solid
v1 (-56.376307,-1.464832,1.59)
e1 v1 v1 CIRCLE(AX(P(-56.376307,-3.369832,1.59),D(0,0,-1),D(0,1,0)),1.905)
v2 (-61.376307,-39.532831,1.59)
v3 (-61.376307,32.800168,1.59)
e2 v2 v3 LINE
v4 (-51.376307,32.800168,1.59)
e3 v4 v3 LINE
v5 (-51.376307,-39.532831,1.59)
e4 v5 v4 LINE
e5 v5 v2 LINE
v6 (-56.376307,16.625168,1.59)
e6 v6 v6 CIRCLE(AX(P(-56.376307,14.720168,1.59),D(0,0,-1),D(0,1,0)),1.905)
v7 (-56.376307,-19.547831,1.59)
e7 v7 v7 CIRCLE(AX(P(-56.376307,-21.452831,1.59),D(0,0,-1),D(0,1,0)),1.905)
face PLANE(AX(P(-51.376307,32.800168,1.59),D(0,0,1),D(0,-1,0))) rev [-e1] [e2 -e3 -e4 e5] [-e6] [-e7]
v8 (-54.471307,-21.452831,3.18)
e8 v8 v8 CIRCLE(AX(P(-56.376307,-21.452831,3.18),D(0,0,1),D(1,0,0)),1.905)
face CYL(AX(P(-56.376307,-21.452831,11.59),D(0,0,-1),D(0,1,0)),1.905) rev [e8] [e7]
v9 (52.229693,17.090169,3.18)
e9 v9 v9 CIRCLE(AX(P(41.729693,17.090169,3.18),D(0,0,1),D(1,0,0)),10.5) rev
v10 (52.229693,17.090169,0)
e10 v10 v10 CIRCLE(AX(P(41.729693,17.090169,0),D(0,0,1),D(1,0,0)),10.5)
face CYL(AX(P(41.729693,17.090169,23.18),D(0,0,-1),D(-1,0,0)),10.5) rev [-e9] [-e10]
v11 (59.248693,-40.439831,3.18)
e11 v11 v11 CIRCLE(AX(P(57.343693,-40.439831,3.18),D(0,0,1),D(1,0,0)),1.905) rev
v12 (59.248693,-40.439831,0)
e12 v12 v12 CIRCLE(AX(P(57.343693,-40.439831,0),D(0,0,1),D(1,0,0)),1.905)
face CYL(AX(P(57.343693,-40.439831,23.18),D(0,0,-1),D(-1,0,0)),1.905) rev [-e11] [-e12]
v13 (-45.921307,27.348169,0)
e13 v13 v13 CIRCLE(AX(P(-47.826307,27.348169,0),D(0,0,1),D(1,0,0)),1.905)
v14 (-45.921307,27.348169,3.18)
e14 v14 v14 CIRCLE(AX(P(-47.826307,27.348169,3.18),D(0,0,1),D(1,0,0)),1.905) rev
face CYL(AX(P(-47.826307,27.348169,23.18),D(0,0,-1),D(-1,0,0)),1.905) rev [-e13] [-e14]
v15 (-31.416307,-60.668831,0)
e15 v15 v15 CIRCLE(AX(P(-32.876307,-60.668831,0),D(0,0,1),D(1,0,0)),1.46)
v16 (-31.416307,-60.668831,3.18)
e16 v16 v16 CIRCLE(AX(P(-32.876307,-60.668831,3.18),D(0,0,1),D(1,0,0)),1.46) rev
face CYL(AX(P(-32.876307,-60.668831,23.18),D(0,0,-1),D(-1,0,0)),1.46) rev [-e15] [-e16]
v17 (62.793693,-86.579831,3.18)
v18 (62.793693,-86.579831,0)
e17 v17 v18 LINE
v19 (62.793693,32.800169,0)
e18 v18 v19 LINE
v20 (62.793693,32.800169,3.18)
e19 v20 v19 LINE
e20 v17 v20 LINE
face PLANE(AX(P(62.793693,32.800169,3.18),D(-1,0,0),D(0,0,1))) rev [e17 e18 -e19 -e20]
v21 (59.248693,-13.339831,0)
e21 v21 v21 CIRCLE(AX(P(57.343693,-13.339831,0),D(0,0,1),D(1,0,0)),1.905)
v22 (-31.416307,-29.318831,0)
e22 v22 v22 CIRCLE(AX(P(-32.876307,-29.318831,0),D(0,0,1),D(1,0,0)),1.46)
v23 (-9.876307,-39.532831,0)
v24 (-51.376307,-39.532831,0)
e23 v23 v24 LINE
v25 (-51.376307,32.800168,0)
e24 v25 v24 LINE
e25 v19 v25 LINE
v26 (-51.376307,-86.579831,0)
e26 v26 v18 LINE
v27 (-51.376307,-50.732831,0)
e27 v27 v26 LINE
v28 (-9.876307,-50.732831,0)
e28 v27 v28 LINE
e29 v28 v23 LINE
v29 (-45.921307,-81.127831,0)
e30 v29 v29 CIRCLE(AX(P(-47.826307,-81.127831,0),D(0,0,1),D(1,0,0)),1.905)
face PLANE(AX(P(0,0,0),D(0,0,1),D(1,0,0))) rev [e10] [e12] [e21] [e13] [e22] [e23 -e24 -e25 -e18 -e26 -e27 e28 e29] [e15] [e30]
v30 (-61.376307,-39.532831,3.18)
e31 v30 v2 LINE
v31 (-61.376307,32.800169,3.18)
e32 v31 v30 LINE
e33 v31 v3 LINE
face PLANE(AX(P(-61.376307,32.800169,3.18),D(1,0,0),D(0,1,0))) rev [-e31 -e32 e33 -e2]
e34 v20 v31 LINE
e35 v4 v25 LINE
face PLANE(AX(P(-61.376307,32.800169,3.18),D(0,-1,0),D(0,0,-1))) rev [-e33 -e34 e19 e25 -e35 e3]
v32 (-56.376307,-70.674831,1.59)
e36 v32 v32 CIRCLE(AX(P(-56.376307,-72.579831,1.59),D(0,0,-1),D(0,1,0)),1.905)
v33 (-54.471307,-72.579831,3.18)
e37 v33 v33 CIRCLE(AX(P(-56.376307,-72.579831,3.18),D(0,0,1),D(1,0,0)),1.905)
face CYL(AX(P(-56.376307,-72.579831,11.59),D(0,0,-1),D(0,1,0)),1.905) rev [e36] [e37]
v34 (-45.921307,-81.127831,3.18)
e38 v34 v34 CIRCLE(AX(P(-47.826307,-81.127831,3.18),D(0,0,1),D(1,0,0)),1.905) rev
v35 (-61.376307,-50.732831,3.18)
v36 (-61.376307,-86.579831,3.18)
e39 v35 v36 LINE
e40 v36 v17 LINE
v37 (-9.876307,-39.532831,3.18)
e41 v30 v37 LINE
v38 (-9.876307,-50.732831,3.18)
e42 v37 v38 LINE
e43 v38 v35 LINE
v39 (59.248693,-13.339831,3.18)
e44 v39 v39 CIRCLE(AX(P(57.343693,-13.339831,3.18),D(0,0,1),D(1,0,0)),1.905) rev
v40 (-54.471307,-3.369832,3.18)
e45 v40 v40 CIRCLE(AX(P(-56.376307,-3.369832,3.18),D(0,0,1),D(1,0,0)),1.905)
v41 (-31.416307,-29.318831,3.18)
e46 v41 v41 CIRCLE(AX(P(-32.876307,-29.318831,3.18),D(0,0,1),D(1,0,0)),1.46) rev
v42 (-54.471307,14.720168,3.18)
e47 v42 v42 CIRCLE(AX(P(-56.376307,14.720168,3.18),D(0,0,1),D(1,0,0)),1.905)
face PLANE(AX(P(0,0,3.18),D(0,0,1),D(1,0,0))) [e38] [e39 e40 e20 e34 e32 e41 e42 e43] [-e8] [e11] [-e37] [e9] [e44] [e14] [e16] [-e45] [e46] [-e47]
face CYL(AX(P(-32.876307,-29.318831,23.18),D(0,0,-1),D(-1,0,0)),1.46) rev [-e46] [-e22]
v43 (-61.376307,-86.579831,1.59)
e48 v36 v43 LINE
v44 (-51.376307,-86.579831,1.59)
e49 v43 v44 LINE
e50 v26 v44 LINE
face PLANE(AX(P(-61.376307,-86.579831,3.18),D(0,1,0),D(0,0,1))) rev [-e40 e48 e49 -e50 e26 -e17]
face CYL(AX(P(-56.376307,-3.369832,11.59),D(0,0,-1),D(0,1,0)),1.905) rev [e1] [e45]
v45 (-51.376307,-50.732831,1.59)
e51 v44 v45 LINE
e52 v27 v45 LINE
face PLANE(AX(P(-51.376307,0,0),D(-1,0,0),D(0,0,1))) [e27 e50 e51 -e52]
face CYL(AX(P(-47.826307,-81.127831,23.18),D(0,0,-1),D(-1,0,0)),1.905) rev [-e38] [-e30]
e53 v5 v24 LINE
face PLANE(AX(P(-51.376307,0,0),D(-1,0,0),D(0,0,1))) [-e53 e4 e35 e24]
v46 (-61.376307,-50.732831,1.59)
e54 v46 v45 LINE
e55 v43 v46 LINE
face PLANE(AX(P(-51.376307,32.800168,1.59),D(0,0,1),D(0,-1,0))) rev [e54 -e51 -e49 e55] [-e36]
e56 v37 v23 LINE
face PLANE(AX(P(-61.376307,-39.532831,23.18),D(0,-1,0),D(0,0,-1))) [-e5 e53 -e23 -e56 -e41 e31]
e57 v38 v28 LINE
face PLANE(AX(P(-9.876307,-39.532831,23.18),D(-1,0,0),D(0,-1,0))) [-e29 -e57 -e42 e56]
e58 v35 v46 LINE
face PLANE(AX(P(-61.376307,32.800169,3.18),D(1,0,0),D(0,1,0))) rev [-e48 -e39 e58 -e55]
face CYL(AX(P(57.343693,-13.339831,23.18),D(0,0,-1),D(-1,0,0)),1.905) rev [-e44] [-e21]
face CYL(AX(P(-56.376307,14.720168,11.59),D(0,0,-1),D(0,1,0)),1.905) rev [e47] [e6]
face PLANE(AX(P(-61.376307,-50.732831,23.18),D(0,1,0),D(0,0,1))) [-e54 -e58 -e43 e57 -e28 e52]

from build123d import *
from OCP.BRepAlgoAPI import BRepAlgoAPI_Cut
from OCP.TopTools import TopTools_ListOfShape

# Parameters (mm, degrees)
SKETCH2_W           = 124.17
SKETCH2_H           = 119.38
BOSS_EXTRUDE1_DEPTH = 3.18
SKETCH3_R           = 1.46
SKETCH3_R_2         = 1.905
SKETCH3_R_3         = 10.5
SKETCH3_W           = 51.5
SKETCH3_H           = 11.2
CUT_EXTRUDE1_DEPTH  = 23.18
SKETCH5_W           = 1.59
SKETCH5_H           = 120
CUT_EXTRUDE2_DEPTH  = 10
SKETCH6_R           = 1.905
CUT_EXTRUDE3_DEPTH  = 10


with BuildPart() as part:
    # Sketch2 → Boss-Extrude1 (new body)
    with BuildSketch(Plane(origin=(0, -1.061487407, 0), x_dir=(1, 0, 0), z_dir=(0, 0, 1))):
        with Locations((0.708693295, -25.828343308)):
            Rectangle(SKETCH2_W, SKETCH2_H)
    extrude(amount=BOSS_EXTRUDE1_DEPTH)

    # Sketch3 → Cut-Extrude1 (cut)
    with BuildSketch(Plane.XY):
        with Locations((-32.876306705, -60.668830715)):
            Circle(SKETCH3_R)
        with Locations((-32.876306705, -29.318830715)):
            Circle(SKETCH3_R)
        with Locations((-47.826306705, 27.348169285)):
            Circle(SKETCH3_R_2)
        with Locations((41.729693295, 17.090169285)):
            Circle(SKETCH3_R_3)
        with Locations((-47.826306705, -81.127830715)):
            Circle(SKETCH3_R_2)
        with Locations((57.343693295, -13.339830715)):
            Circle(SKETCH3_R_2)
        with Locations((57.343693295, -40.439830715)):
            Circle(SKETCH3_R_2)
        with Locations((-35.626306705, -45.132830715)):
            Rectangle(SKETCH3_W, SKETCH3_H)
    extrude(amount=CUT_EXTRUDE1_DEPTH, mode=Mode.SUBTRACT)


with BuildPart() as cut_extrude2_tool:
    # Sketch5 → Cut-Extrude2 (new body)
    with BuildSketch(Plane.ZY.offset(61.376306705)):
        with Locations((0.794999799, -27.199831736)):
            Rectangle(SKETCH5_W, SKETCH5_H)
    extrude(amount=-CUT_EXTRUDE2_DEPTH)


with BuildPart() as part_1:
    add(part.part)

    # Cut-Extrude2: cut by cut_extrude2_tool, with a tolerance
    cut_extrude2_stock = TopTools_ListOfShape()
    cut_extrude2_stock.Append(part_1.part.wrapped)
    cut_extrude2_tools = TopTools_ListOfShape()
    cut_extrude2_tools.Append(cut_extrude2_tool.part.wrapped)
    cut_extrude2_cut = BRepAlgoAPI_Cut()
    cut_extrude2_cut.SetArguments(cut_extrude2_stock)
    cut_extrude2_cut.SetTools(cut_extrude2_tools)
    cut_extrude2_cut.SetFuzzyValue(0.00001)
    cut_extrude2_cut.Build()
    add(Compound.cast(cut_extrude2_cut.Shape()).solids(), mode=Mode.REPLACE)

    # Sketch6 → Cut-Extrude3 (cut)
    with BuildSketch(Plane(origin=(0, 0, 1.589999799), x_dir=(-1, 0, 0), z_dir=(0, 0, -1))):
        with Locations((56.376306705, 14.720168264)):
            Circle(SKETCH6_R)
        with Locations((56.376306705, -3.369831736)):
            Circle(SKETCH6_R)
        with Locations((56.376306705, -21.452830715)):
            Circle(SKETCH6_R)
        with Locations((56.376306705, -72.579830715)):
            Circle(SKETCH6_R)
    extrude(amount=-CUT_EXTRUDE3_DEPTH, mode=Mode.SUBTRACT)


solid = part_1.part
